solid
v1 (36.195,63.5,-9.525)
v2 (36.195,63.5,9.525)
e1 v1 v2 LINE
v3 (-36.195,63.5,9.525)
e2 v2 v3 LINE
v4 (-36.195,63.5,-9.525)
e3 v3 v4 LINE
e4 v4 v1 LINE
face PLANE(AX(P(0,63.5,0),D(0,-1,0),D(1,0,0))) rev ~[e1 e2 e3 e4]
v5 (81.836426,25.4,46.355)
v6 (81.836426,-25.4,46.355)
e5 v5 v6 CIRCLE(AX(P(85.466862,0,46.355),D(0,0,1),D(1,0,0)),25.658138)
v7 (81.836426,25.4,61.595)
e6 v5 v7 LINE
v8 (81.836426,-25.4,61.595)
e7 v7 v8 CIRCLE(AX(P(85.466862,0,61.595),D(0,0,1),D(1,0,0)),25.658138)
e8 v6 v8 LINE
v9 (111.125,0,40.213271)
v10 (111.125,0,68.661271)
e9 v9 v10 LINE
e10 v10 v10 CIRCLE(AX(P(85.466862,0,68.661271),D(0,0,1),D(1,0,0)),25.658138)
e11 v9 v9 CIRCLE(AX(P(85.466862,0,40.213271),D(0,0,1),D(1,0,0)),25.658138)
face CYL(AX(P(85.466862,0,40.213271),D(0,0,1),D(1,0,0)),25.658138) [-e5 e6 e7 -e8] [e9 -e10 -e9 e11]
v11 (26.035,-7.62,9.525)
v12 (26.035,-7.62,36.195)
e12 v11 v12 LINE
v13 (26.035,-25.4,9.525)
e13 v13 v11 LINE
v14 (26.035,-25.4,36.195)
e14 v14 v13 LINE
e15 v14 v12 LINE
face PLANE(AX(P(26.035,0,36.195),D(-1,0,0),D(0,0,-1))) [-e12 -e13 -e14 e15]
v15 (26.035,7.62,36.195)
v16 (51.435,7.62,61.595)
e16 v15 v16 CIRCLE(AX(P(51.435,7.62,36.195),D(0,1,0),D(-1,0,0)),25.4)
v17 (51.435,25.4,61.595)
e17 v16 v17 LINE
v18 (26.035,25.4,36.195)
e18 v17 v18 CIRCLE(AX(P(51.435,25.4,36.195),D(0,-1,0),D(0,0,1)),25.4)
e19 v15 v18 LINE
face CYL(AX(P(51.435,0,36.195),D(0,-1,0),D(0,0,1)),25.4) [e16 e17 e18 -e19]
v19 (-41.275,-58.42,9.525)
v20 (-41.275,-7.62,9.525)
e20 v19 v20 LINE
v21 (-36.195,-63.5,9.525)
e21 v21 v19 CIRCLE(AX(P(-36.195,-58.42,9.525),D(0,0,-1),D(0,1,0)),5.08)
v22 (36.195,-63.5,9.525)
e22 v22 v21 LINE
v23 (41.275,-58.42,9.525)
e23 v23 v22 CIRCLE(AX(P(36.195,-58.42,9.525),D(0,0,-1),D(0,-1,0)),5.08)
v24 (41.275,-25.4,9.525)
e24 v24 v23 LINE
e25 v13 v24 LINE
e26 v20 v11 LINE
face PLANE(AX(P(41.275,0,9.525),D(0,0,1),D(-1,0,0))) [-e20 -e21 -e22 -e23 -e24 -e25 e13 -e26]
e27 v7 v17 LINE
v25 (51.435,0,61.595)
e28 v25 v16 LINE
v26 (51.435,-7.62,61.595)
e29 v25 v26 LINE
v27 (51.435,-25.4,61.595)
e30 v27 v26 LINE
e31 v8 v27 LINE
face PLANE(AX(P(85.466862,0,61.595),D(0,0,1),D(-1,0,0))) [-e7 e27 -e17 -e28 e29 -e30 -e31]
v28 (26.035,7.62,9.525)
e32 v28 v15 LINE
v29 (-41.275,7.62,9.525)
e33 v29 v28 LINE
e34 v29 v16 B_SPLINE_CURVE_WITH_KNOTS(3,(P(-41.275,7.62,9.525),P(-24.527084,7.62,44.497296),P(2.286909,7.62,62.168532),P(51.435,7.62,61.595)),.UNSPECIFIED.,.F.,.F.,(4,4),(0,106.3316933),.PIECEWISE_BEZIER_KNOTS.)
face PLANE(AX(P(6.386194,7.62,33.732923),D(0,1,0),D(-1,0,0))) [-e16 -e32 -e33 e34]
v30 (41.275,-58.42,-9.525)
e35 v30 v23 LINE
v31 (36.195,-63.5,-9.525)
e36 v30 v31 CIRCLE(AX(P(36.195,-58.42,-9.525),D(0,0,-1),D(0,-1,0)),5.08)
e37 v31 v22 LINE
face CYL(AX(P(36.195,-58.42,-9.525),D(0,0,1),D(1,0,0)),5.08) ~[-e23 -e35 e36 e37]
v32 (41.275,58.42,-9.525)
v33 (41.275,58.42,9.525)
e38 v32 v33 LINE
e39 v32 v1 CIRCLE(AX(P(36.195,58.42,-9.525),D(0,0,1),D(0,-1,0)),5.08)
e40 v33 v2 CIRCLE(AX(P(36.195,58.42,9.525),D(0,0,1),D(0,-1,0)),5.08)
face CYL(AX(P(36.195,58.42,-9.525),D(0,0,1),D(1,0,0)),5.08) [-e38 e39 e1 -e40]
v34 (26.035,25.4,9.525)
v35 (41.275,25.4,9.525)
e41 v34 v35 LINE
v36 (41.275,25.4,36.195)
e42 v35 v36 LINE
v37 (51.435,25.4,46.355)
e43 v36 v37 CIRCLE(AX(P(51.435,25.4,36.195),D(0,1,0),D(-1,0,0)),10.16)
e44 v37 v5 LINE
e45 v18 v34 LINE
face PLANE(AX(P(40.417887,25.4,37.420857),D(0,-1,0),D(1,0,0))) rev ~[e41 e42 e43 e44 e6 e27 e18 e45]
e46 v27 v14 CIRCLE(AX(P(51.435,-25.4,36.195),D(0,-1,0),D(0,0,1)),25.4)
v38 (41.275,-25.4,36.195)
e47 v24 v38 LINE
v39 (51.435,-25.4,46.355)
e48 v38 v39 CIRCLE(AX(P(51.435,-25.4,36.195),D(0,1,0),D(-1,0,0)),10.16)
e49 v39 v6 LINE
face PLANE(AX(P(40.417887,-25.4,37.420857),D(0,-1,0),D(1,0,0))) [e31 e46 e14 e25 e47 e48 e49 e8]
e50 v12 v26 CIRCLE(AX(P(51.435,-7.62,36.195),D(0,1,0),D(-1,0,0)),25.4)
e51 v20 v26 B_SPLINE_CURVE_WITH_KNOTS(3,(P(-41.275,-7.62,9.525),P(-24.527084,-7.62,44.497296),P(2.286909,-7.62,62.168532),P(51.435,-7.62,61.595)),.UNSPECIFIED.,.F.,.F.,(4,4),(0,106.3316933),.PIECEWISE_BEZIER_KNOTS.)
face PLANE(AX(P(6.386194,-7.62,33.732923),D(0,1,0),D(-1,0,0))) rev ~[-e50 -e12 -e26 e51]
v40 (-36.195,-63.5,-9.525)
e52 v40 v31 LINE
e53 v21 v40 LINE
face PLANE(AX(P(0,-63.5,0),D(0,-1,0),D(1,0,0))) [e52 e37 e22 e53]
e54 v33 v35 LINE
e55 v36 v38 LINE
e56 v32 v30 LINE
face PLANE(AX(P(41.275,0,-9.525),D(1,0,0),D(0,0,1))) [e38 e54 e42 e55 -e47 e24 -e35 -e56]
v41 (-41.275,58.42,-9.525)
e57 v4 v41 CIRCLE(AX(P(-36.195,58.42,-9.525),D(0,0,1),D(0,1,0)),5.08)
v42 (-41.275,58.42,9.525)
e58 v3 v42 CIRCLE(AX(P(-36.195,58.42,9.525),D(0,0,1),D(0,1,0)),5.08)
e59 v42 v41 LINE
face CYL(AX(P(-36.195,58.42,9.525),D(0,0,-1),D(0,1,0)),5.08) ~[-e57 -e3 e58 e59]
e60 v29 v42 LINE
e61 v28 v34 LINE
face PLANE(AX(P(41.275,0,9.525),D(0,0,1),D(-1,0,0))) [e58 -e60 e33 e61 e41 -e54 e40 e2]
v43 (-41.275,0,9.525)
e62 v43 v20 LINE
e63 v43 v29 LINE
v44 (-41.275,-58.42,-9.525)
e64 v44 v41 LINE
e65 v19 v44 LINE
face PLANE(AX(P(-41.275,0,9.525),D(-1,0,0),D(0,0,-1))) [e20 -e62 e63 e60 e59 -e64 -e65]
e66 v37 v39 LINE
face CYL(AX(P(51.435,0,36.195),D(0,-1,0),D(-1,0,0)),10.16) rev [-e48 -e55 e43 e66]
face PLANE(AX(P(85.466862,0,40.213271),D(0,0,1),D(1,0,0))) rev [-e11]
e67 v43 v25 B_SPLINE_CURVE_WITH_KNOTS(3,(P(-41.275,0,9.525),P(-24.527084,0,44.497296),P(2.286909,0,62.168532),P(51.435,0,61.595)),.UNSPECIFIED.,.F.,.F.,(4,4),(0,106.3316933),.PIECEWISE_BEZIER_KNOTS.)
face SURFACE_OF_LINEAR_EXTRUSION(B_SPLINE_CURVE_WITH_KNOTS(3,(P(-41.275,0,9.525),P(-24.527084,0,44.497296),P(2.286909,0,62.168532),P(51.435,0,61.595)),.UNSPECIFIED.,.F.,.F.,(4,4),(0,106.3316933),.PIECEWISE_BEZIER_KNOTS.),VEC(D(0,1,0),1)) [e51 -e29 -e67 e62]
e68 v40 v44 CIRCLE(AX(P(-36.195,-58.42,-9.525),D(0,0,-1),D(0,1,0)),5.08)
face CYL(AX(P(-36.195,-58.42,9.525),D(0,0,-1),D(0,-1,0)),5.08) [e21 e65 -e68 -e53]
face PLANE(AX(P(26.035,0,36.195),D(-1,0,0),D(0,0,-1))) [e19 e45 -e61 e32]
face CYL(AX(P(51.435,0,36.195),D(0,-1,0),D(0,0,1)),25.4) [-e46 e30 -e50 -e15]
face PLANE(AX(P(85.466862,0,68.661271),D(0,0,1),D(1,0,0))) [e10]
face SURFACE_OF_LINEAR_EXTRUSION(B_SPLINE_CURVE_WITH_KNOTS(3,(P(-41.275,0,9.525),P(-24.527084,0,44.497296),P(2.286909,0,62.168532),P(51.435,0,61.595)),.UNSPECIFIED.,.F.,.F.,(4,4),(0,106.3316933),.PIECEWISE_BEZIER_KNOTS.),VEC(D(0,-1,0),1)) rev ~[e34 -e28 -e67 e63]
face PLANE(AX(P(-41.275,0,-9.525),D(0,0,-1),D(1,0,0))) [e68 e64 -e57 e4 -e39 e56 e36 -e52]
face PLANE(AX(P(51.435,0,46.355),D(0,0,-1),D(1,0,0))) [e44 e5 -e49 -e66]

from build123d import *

# Parameters (mm, degrees)
F1_DEPTH = 63.5
F0_W     = 25.1418616311
F0_H     = 15.24
F2_DEPTH = 25.4
F3_DEPTH = 7.62
F5_R     = 5.08
F6_R     = 5.08
F7_R     = 5.08
F8_R     = 5.08


with BuildPart() as f1:
    # F0 (on Front) → F1 (new body, symmetric)
    with BuildSketch(Plane.XZ):
        Polygon((-41.275, -9.525), (41.275, -9.525), (41.275, 9.525), (26.035, 9.525), (-41.275, 9.525), align=None)
    extrude(amount=F1_DEPTH, both=True)

    # F0 (on Front) → F2 (join, symmetric)
    with BuildSketch(Plane.XZ):
        with BuildLine():
            Line((26.035, 9.525), (41.275, 9.525))
            Line((41.275, 9.525), (41.275, 36.195))
            ThreePointArc((41.275, 36.195), (44.2507951031, 43.3792048969), (51.435, 46.355))
            Line((51.435, 46.355), (60.325, 46.355))
            Line((60.325, 46.355), (60.325, 61.595))
            Line((60.325, 61.595), (51.435, 61.595))
            ThreePointArc((51.435, 61.595), (33.4744877579, 54.1555122421), (26.035, 36.195))
            Line((26.035, 36.195), (26.035, 9.525))
        make_face()
        with Locations((72.8959308155, 53.975)):
            Rectangle(F0_W, F0_H)
    extrude(amount=F2_DEPTH, both=True)

    # F0 (on Front) → F3 (join, symmetric)
    with BuildSketch(Plane.XZ):
        with BuildLine():
            add(Edge.make_bspline(
                [(-41.275, 9.525), (-24.5270843474, 44.4972960267), (2.2869093497, 62.1685317942), (51.435, 61.595)],
                knots=[0, 0, 0, 0, 106.3316932998, 106.3316932998, 106.3316932998, 106.3316932998], degree=3))
            Line((-41.275, 9.525), (26.035, 9.525))
            Line((26.035, 9.525), (26.035, 36.195))
            ThreePointArc((26.035, 36.195), (33.4744877579, 54.1555122421), (51.435, 61.595))
        make_face()
    extrude(amount=F3_DEPTH, both=True)

    # F0 (on Front) → F4 (revolve)
    with BuildSketch(Plane.XZ):
        Polygon((85.4668616311, 68.6612712564), (85.4668616311, 61.595), (85.4668616311, 46.355), (85.4668616311, 40.2132712564), (111.125, 40.2132712564), (111.125, 68.6612712564), align=None)
    revolve(axis=Axis((85.4668616311, 0, 57.5081356282), (0, 0, 1)))

    # F5
    f5_edges = [f1.edges().sort_by_distance(p)[0] for p in [
        (41.275, -63.5, 0),
    ]]
    fillet(f5_edges, radius=F5_R)

    # F6
    f6_edges = [f1.edges().sort_by_distance(p)[0] for p in [
        (-41.275, -63.5, 0),
    ]]
    fillet(f6_edges, radius=F6_R)

    # F7
    f7_edges = [f1.edges().sort_by_distance(p)[0] for p in [
        (41.275, 63.5, 0),
    ]]
    fillet(f7_edges, radius=F7_R)

    # F8
    f8_edges = [f1.edges().sort_by_distance(p)[0] for p in [
        (-41.275, 63.5, 0),
    ]]
    fillet(f8_edges, radius=F8_R)


solid = f1.part
